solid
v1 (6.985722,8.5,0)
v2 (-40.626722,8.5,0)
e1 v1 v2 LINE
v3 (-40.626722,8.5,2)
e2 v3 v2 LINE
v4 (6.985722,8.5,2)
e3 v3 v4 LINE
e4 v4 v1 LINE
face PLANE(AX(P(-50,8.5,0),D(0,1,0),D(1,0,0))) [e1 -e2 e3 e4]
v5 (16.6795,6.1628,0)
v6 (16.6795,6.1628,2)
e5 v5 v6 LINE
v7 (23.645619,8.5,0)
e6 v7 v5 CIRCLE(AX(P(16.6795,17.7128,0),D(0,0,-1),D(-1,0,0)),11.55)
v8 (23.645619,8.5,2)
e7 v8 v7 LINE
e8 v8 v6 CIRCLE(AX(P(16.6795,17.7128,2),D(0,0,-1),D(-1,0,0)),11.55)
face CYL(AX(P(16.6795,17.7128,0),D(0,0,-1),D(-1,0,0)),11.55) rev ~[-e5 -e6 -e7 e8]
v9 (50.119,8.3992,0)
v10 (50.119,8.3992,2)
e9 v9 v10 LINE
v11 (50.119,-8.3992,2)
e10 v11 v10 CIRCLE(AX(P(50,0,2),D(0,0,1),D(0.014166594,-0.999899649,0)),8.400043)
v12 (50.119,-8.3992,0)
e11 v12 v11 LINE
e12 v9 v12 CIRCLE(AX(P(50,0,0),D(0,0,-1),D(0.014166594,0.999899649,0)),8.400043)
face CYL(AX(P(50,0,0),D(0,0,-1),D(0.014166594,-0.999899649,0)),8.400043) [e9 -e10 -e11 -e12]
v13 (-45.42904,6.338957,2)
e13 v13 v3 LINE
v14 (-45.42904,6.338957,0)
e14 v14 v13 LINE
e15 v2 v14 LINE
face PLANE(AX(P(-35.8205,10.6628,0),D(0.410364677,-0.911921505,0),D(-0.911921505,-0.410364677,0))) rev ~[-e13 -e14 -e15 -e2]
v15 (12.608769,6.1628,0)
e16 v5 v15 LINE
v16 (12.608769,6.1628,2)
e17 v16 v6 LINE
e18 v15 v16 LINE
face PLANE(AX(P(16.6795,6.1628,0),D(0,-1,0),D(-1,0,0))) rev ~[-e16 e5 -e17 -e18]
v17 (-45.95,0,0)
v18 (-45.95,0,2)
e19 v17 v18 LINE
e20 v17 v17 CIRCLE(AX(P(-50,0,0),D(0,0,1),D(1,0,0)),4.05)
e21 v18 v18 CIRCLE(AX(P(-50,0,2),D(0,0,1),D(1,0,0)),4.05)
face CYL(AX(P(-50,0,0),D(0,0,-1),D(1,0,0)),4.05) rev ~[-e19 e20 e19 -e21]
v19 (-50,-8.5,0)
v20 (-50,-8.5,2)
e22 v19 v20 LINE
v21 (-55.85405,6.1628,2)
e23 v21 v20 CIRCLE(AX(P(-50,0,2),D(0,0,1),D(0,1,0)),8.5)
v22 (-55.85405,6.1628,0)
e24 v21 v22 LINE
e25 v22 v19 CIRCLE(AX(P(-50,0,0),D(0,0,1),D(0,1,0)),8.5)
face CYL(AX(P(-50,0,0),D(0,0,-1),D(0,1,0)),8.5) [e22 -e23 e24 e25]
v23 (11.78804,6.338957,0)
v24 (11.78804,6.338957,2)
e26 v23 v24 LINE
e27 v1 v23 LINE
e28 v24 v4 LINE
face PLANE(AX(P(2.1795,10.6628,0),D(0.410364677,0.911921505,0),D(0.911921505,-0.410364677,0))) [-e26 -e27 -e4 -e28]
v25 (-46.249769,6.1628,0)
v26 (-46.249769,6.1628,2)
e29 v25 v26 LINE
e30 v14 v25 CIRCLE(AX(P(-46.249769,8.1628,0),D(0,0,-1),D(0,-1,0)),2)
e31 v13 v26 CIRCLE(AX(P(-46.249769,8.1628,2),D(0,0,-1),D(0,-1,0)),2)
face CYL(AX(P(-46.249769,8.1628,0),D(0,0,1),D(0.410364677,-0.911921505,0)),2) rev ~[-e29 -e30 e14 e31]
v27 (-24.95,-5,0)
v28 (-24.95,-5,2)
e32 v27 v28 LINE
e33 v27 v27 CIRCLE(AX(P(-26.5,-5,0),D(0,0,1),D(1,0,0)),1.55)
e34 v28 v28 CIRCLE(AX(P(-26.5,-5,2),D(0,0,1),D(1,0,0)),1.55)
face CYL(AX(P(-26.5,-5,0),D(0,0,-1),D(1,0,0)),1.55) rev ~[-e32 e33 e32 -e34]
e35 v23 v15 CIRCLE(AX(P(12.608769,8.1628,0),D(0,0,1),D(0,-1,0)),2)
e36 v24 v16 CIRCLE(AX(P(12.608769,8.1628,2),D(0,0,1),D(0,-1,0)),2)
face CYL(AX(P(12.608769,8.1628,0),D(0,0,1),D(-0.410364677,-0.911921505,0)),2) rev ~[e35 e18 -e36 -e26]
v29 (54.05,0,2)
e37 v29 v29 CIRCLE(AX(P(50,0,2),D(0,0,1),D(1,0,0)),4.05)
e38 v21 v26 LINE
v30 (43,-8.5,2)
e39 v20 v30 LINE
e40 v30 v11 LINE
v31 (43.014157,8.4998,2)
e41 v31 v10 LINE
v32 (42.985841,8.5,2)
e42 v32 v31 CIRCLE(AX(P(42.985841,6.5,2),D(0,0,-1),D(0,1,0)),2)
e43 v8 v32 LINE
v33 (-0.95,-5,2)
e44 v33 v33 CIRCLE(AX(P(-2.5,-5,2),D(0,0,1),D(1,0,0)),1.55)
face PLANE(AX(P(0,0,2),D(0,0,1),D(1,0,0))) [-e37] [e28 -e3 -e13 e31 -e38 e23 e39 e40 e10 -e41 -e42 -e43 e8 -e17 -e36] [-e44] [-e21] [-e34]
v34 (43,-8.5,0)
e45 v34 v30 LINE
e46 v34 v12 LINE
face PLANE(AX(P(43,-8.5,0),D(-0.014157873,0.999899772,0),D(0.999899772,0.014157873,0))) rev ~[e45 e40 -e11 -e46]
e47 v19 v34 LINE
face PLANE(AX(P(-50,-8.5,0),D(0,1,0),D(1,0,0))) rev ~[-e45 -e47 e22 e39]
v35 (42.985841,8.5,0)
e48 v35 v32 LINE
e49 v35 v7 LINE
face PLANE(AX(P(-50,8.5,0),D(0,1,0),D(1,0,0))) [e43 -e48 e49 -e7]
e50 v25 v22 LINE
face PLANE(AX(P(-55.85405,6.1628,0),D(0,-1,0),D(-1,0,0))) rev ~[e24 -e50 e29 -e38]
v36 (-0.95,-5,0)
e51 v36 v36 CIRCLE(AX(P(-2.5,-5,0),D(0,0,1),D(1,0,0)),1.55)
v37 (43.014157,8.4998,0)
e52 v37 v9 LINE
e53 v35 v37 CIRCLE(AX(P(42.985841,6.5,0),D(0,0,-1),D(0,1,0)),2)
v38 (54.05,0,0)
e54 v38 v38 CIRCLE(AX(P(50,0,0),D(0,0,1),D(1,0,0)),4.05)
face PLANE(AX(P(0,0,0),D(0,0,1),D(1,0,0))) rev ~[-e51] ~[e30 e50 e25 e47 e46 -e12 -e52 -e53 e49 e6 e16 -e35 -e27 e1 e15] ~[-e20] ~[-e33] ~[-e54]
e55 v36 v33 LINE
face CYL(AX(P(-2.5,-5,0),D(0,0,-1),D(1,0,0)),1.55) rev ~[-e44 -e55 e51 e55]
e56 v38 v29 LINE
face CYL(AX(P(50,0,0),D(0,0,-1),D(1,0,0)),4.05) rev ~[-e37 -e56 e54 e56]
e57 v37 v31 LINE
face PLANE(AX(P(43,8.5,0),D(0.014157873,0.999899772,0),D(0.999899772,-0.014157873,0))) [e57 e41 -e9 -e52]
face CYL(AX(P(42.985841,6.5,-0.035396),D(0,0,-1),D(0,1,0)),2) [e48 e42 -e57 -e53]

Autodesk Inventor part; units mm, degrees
ref_plane "YZ Plane" through (0, 0, 0) normal (1, 0, 0) x (0, 1, 0)
ref_plane "XZ Plane" through (0, 0, 0) normal (0, 1, 0) x (-1, 0, 0)
ref_plane "XY Plane" through (0, 0, 0) normal (0, 0, 1) x (1, 0, 0)
sketch "スケッチ1" plane through (0, 0, 0) normal (0, 0, 1) x (1, 0, 0)
  line L0 (-50, 0) -> (50, 0) construction
  circle A0 centre (-50, 0) radius 4.05
  circle A1 centre (50, 0) radius 4.05
  line L1 (-50, 8.5) -> (43, 8.5)
  line L2 (-50, -8.5) -> (43, -8.5)
  arc A2 (-50, 8.5) -> (-50, -8.5) centre (-50, 0) ccw
  line L3 (43, -8.5) -> (50.119, -8.3992)
  line L4 (43, 8.5) -> (50.119, 8.3992)
  arc A3 (50.119, -8.3992) -> (50.119, 8.3992) centre (50, 0) ccw
  line L5 (-29, -7.5) -> (0, -7.5) construction
  line L6 (0, -7.5) -> (0, -2.5) construction
  line L7 (0, -2.5) -> (-29, -2.5) construction
  line L8 (-29, -2.5) -> (-29, -7.5) construction
  line L9 (-29, -5) -> (0, -5) construction
  circle A4 centre (-26.5, -5) radius 1.55
  line L10 (-14.5, -5) -> (-14.5, -2.5) construction
  line L11 (52.3191, 13) -> (22.3191, 13)
  line L12 (22.3191, 13) -> (12.3191, 8.5)
  line L13 (52.3191, 13) -> (57.3191, 4.122)
  circle A5 centre (-2.5, -5) radius 1.55
  point P0 (0, 0)
  point P1 (0, 0)
  point P2 (54.8534, 8.5)
  dimension "d0" = 100
  dimension "d1" = 8.1
  dimension "d2" = 8.5
  dimension "d8" = 8.1
  dimension "d9" = 7
  dimension "d10" = 8.4
  dimension "d12" = 5
  dimension "d13" = 29
  dimension "d15" = 2.5
  dimension "d17" = 13
  dimension "d19" = 10
  dimension "d20" = 30
  dimension "d25" = 50
  dimension "d26" = 5
  dimension "d45" = 1
  dimension "d46" = 3.1
extrude "押し出し1" add sketch "スケッチ1" along normal blind 2 contours L1 L4 A3 L3 L2 A2
fillet "フィレット1" radius 2 1 edges at (43, 8.5, 1)
sketch "スケッチ2" plane through (0, 0, 0) normal (0, 0, -1) x (-1, 0, 0)
  circle A0 centre (-16.6795, 17.7128) radius 11.35 construction
  circle A1 centre (-16.6795, 17.7128) radius 11.55
  line L0 (-16.6795, 6.1628) -> (58.7547, 6.1628)
  line L1 (-16.6795, 17.7128) -> (-34, 27.7128) construction
  circle A2 centre (-50, 0) radius 4.05 projected
  line L2 (-50, 0) -> (-34, 27.7128) construction
  line L3 (50, -8.5) -> (-43, -8.5) projected
  line L4 (-2.1795, 10.6628) -> (35.8205, 10.6628)
  line L5 (35.8205, 10.6628) -> (45.8205, 6.1628)
  line L6 (-2.1795, 10.6628) -> (-12.1795, 6.1628)
  circle A3 centre (50, 0) radius 4.05 projected
  line L7 (58.7547, 6.1628) -> (-13.2236, 28.7337)
  arc A4 (50, -8.5) -> (50, 8.5) centre (50, 0) ccw projected
  point P0 (0, 0)
  dimension "d29" = 22.7
  dimension "d30" = 0.2
  dimension "d31" = 60
  dimension "d32" = 90
  dimension "d33" = 20
  dimension "d34" = 38
  dimension "d35" = 10
  dimension "d36" = 10
  dimension "d37" = 4.5
  dimension "d38" = 32
  dimension "d40" = 4.5
extrude "押し出し2" cut sketch "スケッチ2" against normal through all contours A1 | A1 L7 A4 L0 L5 L4 L6 | L7 L0 A4
fillet "フィレット2" radius 2 2 edges at (12.1795, 6.1628, 1) (-45.8205, 6.1628, 1)
equation "\"d8\" = d1"
equation "\"d19\" = d18"
equation "\"d36\" = d35"
equation "\"d18\" = 10"
properties part number "Link_back_side_frame" material "GFRP"
